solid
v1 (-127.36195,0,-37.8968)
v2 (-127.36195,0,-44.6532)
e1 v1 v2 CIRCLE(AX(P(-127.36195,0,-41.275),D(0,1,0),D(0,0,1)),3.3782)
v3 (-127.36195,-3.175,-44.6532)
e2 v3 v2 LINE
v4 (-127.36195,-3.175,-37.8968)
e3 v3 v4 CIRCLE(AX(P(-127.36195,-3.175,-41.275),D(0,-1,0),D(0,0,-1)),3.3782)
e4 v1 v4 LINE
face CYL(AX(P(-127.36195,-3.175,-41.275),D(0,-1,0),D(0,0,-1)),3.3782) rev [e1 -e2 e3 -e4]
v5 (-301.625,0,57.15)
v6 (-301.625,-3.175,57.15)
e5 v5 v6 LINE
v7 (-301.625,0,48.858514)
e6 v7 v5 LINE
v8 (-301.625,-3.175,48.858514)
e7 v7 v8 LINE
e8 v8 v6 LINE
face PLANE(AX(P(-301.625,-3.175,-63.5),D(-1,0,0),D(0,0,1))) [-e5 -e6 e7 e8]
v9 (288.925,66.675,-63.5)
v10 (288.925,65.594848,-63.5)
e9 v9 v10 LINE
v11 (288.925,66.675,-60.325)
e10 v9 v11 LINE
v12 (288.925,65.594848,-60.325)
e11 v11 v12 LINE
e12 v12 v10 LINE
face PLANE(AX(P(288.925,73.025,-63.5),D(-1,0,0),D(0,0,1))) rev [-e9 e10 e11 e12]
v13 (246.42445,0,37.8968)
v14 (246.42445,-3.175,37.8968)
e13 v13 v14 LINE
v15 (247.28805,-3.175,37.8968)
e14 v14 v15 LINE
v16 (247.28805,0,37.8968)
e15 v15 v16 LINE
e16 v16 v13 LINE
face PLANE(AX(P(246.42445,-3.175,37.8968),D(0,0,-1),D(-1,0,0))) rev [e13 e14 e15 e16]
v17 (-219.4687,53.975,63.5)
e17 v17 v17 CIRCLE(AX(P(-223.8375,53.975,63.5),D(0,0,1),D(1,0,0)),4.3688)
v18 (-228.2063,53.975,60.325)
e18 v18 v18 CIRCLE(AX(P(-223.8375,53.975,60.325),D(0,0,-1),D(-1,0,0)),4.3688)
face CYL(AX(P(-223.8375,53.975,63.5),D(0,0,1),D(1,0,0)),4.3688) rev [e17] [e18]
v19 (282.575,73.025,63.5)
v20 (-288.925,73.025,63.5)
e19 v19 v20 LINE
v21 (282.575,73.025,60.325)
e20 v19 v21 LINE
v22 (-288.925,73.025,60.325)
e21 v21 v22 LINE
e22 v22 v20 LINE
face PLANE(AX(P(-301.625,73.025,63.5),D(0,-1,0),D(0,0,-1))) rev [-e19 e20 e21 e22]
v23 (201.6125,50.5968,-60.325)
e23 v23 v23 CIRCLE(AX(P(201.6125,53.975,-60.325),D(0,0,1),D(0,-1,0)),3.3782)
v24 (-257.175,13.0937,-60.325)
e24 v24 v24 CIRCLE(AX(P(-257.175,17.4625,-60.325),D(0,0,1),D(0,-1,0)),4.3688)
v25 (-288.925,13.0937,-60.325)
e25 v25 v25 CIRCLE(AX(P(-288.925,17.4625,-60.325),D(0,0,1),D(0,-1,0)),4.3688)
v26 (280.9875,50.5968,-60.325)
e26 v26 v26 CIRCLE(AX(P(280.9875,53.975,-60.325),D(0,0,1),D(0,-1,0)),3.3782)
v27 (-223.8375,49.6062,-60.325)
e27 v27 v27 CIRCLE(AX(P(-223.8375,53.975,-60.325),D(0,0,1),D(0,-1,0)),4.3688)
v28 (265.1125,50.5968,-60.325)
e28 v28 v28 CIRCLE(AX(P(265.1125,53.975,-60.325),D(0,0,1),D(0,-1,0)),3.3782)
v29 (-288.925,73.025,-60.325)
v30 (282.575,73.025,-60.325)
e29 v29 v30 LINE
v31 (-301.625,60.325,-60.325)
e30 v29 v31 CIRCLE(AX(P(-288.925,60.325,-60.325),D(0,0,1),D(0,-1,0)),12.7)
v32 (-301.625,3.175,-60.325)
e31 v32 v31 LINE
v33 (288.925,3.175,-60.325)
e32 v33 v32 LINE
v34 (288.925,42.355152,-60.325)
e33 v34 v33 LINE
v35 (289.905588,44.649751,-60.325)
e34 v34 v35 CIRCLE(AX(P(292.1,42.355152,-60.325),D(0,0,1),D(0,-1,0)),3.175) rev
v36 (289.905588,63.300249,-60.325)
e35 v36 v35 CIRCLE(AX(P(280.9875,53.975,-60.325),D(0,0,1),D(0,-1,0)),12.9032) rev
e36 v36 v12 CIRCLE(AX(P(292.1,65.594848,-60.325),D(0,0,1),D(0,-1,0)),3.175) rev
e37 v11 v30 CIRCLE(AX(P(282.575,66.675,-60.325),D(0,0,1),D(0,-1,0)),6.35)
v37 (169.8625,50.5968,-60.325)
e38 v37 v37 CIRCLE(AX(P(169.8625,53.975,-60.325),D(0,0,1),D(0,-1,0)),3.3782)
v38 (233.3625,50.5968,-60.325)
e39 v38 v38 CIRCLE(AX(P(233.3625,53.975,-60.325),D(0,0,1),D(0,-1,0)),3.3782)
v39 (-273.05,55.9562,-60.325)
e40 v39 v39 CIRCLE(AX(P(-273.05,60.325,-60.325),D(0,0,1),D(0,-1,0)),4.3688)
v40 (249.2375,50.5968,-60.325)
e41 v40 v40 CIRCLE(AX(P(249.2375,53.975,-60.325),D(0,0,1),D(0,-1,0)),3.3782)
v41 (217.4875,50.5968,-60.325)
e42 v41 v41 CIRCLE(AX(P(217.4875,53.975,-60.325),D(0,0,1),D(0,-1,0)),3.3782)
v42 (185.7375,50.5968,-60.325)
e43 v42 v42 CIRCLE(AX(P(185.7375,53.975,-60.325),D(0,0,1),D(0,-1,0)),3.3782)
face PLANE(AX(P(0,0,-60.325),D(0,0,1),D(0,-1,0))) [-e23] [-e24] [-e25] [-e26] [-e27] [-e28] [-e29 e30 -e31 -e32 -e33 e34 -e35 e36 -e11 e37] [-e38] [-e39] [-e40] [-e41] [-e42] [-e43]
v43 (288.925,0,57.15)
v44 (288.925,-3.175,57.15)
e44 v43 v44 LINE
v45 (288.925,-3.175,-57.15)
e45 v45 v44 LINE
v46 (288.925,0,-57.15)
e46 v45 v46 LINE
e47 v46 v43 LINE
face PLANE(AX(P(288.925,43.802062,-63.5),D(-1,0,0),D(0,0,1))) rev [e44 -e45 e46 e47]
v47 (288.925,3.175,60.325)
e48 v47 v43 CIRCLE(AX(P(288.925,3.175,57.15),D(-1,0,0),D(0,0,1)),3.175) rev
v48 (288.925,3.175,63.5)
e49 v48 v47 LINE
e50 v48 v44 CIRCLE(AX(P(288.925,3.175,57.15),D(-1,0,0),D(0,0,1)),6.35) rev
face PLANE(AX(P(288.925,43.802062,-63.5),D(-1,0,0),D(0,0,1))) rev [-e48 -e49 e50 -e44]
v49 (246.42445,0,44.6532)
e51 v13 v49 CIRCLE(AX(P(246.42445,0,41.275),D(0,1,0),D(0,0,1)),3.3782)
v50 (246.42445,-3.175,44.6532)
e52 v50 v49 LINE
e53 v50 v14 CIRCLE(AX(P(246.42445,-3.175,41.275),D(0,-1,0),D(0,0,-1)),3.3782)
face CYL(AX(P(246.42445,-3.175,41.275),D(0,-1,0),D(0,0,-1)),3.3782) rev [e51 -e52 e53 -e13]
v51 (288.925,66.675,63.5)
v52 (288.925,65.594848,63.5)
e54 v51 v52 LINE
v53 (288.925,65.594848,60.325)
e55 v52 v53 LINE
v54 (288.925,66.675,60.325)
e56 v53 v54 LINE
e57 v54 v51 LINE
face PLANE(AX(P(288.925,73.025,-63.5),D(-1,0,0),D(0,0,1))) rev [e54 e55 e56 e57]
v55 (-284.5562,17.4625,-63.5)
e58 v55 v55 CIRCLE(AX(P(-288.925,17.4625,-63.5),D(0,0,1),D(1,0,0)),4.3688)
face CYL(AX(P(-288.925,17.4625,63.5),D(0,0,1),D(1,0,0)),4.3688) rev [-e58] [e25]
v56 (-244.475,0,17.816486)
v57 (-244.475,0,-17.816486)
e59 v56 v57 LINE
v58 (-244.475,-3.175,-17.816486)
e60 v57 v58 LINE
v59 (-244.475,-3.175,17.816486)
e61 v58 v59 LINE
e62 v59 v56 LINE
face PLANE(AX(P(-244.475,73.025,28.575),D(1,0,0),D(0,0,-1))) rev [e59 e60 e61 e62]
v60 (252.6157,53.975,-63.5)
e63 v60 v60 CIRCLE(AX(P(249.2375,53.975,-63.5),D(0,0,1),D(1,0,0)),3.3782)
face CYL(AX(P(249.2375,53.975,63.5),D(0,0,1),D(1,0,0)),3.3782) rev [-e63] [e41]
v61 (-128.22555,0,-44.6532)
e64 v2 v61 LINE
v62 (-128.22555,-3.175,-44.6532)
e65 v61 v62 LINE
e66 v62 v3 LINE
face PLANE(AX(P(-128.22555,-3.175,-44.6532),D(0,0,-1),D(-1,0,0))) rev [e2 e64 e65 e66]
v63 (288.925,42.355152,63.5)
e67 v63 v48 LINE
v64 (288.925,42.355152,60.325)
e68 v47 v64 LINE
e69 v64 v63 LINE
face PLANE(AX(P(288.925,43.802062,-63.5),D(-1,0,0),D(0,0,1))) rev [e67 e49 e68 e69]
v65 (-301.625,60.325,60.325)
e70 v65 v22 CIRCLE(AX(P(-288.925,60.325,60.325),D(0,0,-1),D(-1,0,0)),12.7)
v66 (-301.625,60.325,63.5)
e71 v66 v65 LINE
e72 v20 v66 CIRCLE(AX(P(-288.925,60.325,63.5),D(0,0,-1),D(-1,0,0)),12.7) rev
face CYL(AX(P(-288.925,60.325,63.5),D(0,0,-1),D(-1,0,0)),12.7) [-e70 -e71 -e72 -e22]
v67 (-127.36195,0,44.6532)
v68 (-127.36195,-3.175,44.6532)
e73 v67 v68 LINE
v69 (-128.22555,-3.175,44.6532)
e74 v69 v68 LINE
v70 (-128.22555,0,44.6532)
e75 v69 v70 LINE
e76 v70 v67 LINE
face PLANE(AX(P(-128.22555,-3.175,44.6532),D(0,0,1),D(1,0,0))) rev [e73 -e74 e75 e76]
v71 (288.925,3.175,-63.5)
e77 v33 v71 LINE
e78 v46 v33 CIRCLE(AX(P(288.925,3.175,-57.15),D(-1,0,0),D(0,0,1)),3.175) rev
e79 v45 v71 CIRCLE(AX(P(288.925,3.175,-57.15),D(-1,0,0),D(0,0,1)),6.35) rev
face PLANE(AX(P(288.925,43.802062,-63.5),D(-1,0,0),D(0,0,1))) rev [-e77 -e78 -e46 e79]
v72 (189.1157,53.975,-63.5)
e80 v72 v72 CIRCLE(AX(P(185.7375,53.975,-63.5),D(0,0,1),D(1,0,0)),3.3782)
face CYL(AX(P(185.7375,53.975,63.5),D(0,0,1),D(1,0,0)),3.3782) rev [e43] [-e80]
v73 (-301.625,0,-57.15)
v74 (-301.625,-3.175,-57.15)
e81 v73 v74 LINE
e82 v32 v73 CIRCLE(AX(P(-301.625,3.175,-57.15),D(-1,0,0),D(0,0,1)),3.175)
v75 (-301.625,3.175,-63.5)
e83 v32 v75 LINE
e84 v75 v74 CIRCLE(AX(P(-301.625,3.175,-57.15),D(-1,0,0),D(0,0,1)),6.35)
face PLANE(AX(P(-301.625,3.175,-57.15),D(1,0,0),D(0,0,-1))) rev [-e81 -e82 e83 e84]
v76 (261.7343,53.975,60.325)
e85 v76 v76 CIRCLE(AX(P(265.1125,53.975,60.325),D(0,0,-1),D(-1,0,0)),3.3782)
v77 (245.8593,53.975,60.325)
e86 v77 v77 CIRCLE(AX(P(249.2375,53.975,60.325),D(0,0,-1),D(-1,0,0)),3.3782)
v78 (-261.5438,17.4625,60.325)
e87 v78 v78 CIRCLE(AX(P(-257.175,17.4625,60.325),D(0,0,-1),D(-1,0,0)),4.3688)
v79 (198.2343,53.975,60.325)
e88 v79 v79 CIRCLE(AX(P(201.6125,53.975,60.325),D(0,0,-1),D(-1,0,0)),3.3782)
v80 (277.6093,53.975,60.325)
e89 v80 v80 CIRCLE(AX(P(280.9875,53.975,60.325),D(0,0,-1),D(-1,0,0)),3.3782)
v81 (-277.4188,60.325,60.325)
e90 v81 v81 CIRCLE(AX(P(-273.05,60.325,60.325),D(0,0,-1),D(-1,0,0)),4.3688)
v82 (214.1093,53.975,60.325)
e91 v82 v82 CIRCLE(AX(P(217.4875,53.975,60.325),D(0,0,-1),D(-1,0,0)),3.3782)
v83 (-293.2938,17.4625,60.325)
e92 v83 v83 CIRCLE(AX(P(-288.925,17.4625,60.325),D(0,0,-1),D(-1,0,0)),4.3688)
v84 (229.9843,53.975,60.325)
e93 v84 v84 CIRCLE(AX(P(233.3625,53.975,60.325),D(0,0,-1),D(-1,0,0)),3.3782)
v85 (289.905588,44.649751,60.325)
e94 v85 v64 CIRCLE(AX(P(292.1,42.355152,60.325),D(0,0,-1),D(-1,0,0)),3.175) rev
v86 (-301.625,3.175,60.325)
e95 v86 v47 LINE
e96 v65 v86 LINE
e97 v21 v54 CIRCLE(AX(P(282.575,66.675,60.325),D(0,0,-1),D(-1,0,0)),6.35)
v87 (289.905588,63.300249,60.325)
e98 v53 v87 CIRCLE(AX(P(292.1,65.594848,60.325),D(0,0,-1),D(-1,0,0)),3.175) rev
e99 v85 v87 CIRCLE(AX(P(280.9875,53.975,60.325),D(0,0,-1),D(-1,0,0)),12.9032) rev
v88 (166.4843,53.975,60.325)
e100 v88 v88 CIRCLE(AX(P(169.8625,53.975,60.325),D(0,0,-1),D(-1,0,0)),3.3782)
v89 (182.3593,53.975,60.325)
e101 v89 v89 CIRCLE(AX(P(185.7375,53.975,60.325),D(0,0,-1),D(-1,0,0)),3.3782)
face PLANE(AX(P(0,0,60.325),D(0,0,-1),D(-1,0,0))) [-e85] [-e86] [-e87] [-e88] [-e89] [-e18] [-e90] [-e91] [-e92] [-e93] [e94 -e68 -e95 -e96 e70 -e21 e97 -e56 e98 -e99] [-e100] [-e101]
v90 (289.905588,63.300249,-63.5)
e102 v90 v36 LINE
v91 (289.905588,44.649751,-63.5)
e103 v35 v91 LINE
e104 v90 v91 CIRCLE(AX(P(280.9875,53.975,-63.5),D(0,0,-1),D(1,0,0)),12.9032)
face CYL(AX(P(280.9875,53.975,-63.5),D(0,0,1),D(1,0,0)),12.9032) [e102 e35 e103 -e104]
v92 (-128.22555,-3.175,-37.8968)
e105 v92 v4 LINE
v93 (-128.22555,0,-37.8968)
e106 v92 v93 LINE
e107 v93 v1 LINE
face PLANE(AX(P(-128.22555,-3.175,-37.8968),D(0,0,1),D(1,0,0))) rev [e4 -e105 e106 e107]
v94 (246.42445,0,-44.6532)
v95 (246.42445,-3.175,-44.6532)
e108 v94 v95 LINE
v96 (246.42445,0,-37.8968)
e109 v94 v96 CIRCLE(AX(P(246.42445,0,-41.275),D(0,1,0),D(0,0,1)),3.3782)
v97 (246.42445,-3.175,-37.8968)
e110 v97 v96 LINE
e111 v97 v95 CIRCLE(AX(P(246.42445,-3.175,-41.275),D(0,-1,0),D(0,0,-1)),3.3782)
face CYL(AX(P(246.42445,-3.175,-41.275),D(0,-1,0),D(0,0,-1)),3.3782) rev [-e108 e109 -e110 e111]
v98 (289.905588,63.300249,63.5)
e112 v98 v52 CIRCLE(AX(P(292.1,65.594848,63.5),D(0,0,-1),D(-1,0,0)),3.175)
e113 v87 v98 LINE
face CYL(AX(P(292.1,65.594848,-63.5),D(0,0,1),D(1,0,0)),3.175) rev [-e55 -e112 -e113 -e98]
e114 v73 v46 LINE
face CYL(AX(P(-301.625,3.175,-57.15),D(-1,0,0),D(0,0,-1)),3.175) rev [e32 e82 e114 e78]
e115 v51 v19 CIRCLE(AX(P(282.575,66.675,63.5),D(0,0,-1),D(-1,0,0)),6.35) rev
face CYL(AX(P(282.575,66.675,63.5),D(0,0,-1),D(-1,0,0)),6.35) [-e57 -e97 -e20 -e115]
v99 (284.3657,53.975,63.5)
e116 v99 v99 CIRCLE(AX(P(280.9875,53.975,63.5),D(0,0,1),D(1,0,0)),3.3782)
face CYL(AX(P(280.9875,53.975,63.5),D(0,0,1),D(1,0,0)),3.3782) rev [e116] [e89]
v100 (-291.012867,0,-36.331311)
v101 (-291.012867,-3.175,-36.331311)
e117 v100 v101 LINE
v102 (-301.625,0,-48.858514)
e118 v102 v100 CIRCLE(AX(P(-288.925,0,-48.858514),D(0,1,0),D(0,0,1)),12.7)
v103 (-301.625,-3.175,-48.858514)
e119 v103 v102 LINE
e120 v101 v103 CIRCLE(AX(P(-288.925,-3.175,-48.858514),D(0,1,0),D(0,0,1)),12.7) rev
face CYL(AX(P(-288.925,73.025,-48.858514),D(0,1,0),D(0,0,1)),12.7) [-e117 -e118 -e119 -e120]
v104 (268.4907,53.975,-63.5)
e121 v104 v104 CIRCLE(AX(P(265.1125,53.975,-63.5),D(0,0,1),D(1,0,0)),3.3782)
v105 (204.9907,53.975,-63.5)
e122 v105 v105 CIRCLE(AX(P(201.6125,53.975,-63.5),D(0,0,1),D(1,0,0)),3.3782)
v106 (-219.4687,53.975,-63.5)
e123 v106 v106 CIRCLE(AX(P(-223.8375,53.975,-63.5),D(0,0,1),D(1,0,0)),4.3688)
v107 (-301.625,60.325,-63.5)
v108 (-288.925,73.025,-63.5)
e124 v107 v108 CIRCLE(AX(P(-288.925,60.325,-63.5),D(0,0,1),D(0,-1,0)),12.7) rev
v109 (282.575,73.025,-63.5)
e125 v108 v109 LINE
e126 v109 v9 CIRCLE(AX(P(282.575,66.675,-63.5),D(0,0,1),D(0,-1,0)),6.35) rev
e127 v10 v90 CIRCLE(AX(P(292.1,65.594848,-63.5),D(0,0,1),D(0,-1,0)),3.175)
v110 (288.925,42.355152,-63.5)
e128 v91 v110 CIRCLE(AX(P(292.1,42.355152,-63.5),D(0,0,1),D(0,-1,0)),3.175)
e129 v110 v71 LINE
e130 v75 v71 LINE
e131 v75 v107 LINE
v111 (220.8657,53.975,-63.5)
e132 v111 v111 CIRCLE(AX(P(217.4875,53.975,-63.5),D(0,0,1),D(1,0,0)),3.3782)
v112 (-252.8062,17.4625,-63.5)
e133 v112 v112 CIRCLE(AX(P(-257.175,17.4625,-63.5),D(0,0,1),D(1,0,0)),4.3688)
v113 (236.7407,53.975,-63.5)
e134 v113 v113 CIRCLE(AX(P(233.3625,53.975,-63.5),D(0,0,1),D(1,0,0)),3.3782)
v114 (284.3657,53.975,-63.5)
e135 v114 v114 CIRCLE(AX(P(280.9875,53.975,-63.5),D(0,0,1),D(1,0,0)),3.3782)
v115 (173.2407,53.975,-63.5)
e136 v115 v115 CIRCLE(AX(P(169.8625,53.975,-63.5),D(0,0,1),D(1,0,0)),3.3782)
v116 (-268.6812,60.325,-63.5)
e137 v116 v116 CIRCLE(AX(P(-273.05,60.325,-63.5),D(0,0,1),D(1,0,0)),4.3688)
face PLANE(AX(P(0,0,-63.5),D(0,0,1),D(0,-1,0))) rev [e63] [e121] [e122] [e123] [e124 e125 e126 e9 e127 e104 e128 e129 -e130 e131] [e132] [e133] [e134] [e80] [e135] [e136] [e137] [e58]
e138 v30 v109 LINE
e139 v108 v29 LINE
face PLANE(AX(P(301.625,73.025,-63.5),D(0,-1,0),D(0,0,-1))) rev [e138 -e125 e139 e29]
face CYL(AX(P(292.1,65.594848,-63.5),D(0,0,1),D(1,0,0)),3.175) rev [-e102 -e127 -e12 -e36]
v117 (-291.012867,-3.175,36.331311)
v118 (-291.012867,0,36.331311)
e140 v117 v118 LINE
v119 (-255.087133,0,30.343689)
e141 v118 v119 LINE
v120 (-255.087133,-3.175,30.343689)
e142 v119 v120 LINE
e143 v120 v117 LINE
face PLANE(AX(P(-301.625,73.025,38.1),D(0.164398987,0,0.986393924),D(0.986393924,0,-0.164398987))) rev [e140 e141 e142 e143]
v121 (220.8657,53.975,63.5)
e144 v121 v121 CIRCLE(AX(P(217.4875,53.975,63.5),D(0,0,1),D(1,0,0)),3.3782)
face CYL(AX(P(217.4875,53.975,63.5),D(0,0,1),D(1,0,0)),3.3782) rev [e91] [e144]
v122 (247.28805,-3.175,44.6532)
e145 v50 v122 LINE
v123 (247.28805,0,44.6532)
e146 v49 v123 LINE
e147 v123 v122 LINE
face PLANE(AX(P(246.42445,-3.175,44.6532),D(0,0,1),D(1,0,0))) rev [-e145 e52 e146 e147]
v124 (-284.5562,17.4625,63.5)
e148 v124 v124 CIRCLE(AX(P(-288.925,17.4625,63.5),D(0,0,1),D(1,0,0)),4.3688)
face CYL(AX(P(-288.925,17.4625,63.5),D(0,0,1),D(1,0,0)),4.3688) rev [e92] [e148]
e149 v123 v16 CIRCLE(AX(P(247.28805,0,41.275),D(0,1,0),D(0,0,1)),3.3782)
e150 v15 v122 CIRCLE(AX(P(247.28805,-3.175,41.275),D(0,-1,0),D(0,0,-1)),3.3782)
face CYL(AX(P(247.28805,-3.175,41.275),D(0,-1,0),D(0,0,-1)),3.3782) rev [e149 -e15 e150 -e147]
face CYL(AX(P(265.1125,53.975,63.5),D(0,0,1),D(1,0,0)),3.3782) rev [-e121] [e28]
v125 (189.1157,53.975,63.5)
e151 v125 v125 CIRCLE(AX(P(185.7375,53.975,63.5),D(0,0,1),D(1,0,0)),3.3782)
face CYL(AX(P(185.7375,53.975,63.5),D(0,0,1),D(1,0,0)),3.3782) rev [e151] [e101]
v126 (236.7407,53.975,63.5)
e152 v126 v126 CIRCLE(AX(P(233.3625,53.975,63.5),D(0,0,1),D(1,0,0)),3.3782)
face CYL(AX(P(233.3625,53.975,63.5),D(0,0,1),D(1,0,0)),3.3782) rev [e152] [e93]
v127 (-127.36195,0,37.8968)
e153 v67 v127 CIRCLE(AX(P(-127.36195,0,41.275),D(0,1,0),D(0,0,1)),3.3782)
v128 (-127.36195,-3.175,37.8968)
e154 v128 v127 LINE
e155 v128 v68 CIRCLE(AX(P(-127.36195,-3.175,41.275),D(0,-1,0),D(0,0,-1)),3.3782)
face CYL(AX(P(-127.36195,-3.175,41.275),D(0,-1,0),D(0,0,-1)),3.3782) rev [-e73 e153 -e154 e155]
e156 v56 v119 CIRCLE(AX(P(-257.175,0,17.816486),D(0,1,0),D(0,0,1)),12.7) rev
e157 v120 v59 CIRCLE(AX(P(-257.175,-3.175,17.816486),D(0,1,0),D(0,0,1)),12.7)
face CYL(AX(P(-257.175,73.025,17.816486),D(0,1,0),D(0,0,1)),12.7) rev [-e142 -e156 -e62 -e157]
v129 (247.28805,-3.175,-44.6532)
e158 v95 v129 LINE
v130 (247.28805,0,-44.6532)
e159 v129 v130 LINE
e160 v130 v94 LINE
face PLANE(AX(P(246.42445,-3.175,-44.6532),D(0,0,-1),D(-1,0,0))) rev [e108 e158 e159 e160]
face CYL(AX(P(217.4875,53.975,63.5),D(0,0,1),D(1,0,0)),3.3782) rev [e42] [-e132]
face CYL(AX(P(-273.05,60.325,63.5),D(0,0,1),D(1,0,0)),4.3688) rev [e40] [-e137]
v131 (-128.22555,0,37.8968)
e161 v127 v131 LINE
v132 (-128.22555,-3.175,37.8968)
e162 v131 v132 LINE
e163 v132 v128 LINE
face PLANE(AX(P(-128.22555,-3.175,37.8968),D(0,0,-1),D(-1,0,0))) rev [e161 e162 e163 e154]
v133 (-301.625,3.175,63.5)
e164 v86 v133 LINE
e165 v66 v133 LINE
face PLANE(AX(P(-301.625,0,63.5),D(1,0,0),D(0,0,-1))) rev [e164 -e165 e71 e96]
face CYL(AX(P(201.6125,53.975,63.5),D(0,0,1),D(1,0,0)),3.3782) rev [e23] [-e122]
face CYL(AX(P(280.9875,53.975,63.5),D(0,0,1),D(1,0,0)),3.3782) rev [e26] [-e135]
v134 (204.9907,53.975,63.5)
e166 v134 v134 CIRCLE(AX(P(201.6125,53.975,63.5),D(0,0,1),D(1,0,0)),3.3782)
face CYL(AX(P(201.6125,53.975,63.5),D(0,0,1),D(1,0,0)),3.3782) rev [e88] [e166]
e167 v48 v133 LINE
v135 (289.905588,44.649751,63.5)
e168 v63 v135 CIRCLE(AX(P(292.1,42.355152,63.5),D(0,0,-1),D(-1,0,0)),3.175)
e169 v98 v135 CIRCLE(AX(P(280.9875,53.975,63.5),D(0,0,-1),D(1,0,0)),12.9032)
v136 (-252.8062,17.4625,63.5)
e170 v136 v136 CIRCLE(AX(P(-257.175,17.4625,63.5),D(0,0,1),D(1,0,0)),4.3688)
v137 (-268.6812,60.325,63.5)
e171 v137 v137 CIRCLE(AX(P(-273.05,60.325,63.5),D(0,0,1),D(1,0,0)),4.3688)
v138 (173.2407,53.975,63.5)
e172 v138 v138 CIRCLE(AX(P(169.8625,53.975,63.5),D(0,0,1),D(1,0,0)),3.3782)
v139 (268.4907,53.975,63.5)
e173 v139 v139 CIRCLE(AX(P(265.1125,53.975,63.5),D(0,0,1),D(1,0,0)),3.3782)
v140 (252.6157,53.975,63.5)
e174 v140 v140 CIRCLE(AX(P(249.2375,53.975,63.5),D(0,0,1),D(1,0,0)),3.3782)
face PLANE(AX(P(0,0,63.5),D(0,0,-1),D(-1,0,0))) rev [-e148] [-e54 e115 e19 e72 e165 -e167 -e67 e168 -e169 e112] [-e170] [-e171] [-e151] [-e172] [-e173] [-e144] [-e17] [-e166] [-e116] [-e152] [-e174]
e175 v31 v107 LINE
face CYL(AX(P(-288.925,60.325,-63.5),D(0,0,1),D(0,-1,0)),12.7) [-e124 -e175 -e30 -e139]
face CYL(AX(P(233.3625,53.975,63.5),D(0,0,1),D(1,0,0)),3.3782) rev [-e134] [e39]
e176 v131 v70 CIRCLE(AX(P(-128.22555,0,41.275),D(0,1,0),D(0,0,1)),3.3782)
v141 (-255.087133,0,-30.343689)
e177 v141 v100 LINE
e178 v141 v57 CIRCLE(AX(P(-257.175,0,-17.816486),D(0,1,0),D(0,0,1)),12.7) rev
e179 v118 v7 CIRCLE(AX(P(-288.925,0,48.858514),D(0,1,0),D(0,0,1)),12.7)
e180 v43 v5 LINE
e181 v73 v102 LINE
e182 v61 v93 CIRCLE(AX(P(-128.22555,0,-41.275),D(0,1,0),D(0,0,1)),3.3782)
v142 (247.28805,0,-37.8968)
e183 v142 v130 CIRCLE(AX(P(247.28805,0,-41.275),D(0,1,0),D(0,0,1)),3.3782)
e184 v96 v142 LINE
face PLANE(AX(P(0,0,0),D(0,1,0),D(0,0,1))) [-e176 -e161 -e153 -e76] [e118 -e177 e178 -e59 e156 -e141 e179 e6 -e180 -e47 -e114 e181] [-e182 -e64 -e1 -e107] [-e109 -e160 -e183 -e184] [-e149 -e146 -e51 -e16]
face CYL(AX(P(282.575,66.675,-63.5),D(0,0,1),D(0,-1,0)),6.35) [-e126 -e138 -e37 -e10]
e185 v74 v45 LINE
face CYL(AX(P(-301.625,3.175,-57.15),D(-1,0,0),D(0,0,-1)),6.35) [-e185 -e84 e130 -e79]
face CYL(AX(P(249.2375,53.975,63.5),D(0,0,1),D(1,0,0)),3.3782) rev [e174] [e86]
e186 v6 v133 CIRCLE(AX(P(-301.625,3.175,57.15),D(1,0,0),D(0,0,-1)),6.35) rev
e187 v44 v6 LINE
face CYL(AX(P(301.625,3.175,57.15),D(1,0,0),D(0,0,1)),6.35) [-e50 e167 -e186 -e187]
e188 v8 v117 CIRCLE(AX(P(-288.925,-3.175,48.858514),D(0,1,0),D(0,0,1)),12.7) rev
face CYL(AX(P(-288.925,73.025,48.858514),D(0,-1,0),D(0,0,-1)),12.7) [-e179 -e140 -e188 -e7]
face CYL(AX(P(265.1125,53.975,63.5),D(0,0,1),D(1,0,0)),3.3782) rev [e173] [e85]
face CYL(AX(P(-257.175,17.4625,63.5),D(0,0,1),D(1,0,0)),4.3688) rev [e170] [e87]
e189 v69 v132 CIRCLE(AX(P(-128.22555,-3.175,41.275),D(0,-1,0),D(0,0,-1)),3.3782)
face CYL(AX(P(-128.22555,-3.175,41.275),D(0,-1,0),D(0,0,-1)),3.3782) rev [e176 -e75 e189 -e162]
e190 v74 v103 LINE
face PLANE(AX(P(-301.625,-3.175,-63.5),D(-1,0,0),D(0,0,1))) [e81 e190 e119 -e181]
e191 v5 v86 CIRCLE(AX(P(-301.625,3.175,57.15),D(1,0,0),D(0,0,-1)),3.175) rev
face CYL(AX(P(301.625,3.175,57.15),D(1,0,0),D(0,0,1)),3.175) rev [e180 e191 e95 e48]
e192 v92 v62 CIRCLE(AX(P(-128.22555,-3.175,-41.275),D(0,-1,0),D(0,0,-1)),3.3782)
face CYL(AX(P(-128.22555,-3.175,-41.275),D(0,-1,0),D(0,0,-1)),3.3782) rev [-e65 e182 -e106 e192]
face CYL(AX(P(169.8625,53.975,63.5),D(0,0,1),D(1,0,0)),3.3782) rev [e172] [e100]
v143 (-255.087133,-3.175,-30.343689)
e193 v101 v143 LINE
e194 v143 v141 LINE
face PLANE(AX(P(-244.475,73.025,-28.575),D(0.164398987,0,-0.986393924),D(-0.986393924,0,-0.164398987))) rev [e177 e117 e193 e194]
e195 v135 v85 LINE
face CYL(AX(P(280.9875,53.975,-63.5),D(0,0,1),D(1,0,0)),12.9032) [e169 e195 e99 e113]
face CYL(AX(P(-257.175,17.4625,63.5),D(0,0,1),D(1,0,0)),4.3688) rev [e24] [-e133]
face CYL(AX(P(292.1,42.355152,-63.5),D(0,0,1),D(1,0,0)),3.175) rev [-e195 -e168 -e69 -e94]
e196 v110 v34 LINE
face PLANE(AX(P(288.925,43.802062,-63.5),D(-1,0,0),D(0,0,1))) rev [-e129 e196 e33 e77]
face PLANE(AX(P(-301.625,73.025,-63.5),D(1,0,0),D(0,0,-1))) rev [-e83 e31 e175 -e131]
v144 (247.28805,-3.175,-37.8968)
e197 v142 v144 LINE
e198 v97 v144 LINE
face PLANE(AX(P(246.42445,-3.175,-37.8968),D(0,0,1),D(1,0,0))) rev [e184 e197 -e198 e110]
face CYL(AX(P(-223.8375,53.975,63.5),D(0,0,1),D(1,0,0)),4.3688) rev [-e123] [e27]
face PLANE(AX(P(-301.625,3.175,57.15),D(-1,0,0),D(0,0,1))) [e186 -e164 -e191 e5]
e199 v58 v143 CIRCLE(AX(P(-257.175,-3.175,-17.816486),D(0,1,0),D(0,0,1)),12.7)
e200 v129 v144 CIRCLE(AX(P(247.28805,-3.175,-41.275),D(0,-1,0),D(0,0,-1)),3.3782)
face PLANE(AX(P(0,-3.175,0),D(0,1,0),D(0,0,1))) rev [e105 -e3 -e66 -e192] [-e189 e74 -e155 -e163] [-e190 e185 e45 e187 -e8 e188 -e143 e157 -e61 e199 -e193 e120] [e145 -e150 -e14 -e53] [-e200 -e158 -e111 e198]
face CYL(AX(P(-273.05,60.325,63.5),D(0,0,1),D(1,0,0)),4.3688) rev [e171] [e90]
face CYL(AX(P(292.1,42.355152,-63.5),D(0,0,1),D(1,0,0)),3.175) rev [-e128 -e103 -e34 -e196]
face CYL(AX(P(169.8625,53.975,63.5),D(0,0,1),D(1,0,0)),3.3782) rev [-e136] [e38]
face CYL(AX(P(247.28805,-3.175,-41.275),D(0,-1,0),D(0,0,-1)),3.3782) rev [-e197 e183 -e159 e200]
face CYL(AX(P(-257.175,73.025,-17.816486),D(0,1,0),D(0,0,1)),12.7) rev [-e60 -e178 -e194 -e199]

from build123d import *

# Parameters (mm, degrees)
SKETCH1_W                                 = 603.25
SKETCH1_H                                 = 127
BASE_FLANGE1_DEPTH                        = 3.175
EDGE_FLANGE1_STRIP_W                      = 19.05
EDGE_FLANGE1_STRIP_H                      = 3.175
EDGE_FLANGE1_STRIP_CUT_DEPTH              = 603.25
EDGE_FLANGE1_STRIP_2_W                    = 19.05
EDGE_FLANGE1_STRIP_2_H                    = 3.175
EDGE_FLANGE1_STRIP_CUT_2_DEPTH            = 603.25
EDGE_FLANGE1_DEPTH                        = 603.25
EDGE_FLANGE1_BEND_DEPTH                   = 603.25
F_1_4_CLEARANCE_HOLE1_D                   = 6.7564
HOLE_FOR_1_4_SELF_CLINCHING_NUTS_S_SS_C_D = 8.7376
CUT_EXTRUDE3_DEPTH                        = 336.319685151
FILLET1_R                                 = 6.35
HOLE_FOR_1_4_SELF_CLINCHING_NUTS_S_2_D    = 8.7376
CUT_EXTRUDE2_DEPTH                        = 318.515874603
FILLET3_R                                 = 12.7
FILLET4_R                                 = 12.7
F_1_4_START                               = -3.175
F_1_4_CLEARANCE_SLOT1_DEPTH               = 3.175
FILLET5_R                                 = 3.175


# Read off the part's stored shape, not the designer's step: 1/4 Clearance Slot1
# Sheet-metal steps are written as plain solids
with BuildPart() as part:
    # Sketch1 → Base-Flange1 (new body)
    with BuildSketch(Plane(origin=(0, 0, 0), x_dir=(1, 0, 0), z_dir=(0, 1, 0))):
        Rectangle(SKETCH1_W, SKETCH1_H)
    extrude(amount=-BASE_FLANGE1_DEPTH)

    # Edge-Flange1 strip (across the edge) → Edge-Flange1 strip cut (cut)
    with BuildSketch(Plane(origin=(301.625, 0, -63.5), x_dir=(0, 0, 1), z_dir=(-1, 0, 0))):
        with Locations((-3.175, -1.5875)):
            Rectangle(EDGE_FLANGE1_STRIP_W, EDGE_FLANGE1_STRIP_H)
    extrude(amount=EDGE_FLANGE1_STRIP_CUT_DEPTH, mode=Mode.SUBTRACT)

    # Edge-Flange1 strip 2 (across the edge) → Edge-Flange1 strip cut 2 (cut)
    with BuildSketch(Plane(origin=(-301.625, 0, 63.5), x_dir=(0, 0, -1), z_dir=(1, 0, 0))):
        with Locations((-3.175, -1.5875)):
            Rectangle(EDGE_FLANGE1_STRIP_2_W, EDGE_FLANGE1_STRIP_2_H)
    extrude(amount=EDGE_FLANGE1_STRIP_CUT_2_DEPTH, mode=Mode.SUBTRACT)

    # Edge-Flange1 section (across the edge) → Edge-Flange1 (add)
    with BuildSketch(Plane(origin=(301.625, 0, -63.5), x_dir=(0, 0, 1), z_dir=(-1, 0, 0))):
        with BuildLine():
            Line((0, 3.175), (0, 73.025))
            Line((0, 73.025), (3.175, 73.025))
            Line((3.175, 73.025), (3.175, 3.175))
            ThreePointArc((3.175, 3.175), (4.10493597, 0.92993597), (6.35, 0))
            Line((6.35, 0), (6.35, -3.175))
            ThreePointArc((6.35, -3.175), (1.859871939, -1.315128061), (0, 3.175))
        make_face()
    extrude(amount=EDGE_FLANGE1_DEPTH)

    # Edge-Flange1 section 2 (across the edge) → Edge-Flange1 bend (add)
    with BuildSketch(Plane(origin=(-301.625, 0, 63.5), x_dir=(0, 0, -1), z_dir=(1, 0, 0))):
        with BuildLine():
            Line((0, 3.175), (0, 73.025))
            Line((0, 73.025), (3.175, 73.025))
            Line((3.175, 73.025), (3.175, 3.175))
            ThreePointArc((3.175, 3.175), (4.10493597, 0.92993597), (6.35, 0))
            Line((6.35, 0), (6.35, -3.175))
            ThreePointArc((6.35, -3.175), (1.859871939, -1.315128061), (0, 3.175))
        make_face()
    extrude(amount=EDGE_FLANGE1_BEND_DEPTH)

    # 1/4 Clearance Hole1 (through all)
    with Locations(Plane.XY.offset(63.5)):
        with Locations((169.8625, 53.975), (185.7375, 53.975), (201.6125, 53.975), (217.4875, 53.975), (233.3625, 53.975), (249.2375, 53.975), (265.1125, 53.975), (280.9875, 53.975)):
            Hole(F_1_4_CLEARANCE_HOLE1_D / 2)

    # Hole for 1_4 Self-clinching Nuts _S_SS_C (through all)
    with Locations(Plane.XY.offset(63.5)):
        with Locations((-223.8375, 53.975)):
            Hole(HOLE_FOR_1_4_SELF_CLINCHING_NUTS_S_SS_C_D / 2)

    # Sketch33 → Cut-Extrude3 (cut, through all)
    with BuildSketch(Plane.XY.offset(63.5)):
        with BuildLine():
            Line((301.625, 73.025), (288.925, 73.025))
            Line((288.925, 73.025), (288.925, 64.147937825))
            ThreePointArc((288.925, 64.147937825), (293.8907, 53.975), (288.925, 43.802062175))
            Line((288.925, 43.802062175), (288.925, -3.175))
            Line((288.925, -3.175), (301.625, -3.175))
            Line((301.625, -3.175), (301.625, 73.025))
        make_face()
    extrude(amount=-CUT_EXTRUDE3_DEPTH, mode=Mode.SUBTRACT)

    # Fillet1
    fillet1_edges = [part.edges().sort_by_distance(p)[0] for p in [
        (288.925, 73.025, 61.9125),
        (288.925, 73.025, -61.9125),
    ]]
    fillet(fillet1_edges, radius=FILLET1_R)

    # Hole for 1_4 Self-clinching Nuts _S_ 2 (through all)
    with Locations(Plane.XY.offset(63.5)):
        with Locations((-273.05, 60.325), (-257.175, 17.4625), (-288.925, 17.4625)):
            Hole(HOLE_FOR_1_4_SELF_CLINCHING_NUTS_S_2_D / 2)

    # Sketch23 → Cut-Extrude2 (cut, through all)
    with BuildSketch(Plane.XZ.offset(3.175)):
        Polygon((-301.625, 38.1), (-244.475, 28.575), (-244.475, -28.575), (-301.625, -38.1), align=None)
    extrude(amount=-CUT_EXTRUDE2_DEPTH, mode=Mode.SUBTRACT)

    # Fillet3
    fillet3_edges = [part.edges().sort_by_distance(p)[0] for p in [
        (-301.625, -1.5875, -38.1),
        (-301.625, -1.5875, 38.1),
        (-244.475, -1.5875, 28.575),
        (-244.475, -1.5875, -28.575),
    ]]
    fillet(fillet3_edges, radius=FILLET3_R)

    # Fillet4
    fillet4_edges = [part.edges().sort_by_distance(p)[0] for p in [
        (-301.625, 73.025, -61.9125),
        (-301.625, 73.025, 61.9125),
    ]]
    fillet(fillet4_edges, radius=FILLET4_R)

    # 1/4 Clearance Slot1 outline → 1/4 Clearance Slot1 (cut)
    with BuildSketch(Plane(origin=(0, 0, 0), x_dir=(1, 0, 0), z_dir=(0, 1, 0)).offset(F_1_4_START)):
        with BuildLine():
            ThreePointArc((247.28805, -44.6532), (250.66625, -41.275), (247.28805, -37.8968))
            Line((247.28805, -37.8968), (246.42445, -37.8968))
            ThreePointArc((246.42445, -37.8968), (243.04625, -41.275), (246.42445, -44.6532))
            Line((246.42445, -44.6532), (247.28805, -44.6532))
        make_face()
        with BuildLine():
            ThreePointArc((-128.22555, -37.8968), (-131.60375, -41.275), (-128.22555, -44.6532))
            Line((-128.22555, -44.6532), (-127.36195, -44.6532))
            ThreePointArc((-127.36195, -44.6532), (-123.98375, -41.275), (-127.36195, -37.8968))
            Line((-127.36195, -37.8968), (-128.22555, -37.8968))
        make_face()
        with BuildLine():
            ThreePointArc((-127.36195, 37.8968), (-123.98375, 41.275), (-127.36195, 44.6532))
            Line((-127.36195, 44.6532), (-128.22555, 44.6532))
            ThreePointArc((-128.22555, 44.6532), (-131.60375, 41.275), (-128.22555, 37.8968))
            Line((-128.22555, 37.8968), (-127.36195, 37.8968))
        make_face()
        with BuildLine():
            ThreePointArc((246.42445, 44.6532), (243.04625, 41.275), (246.42445, 37.8968))
            Line((246.42445, 37.8968), (247.28805, 37.8968))
            ThreePointArc((247.28805, 37.8968), (250.66625, 41.275), (247.28805, 44.6532))
            Line((247.28805, 44.6532), (246.42445, 44.6532))
        make_face()
    extrude(amount=F_1_4_CLEARANCE_SLOT1_DEPTH, mode=Mode.SUBTRACT)

    # Fillet5
    fillet5_edges = [part.edges().sort_by_distance(p)[0] for p in [
        (288.925, 43.802062175, -61.9125),
        (288.925, 64.147937825, -61.9125),
        (288.925, 43.802062175, 61.9125),
        (288.925, 64.147937825, 61.9125),
    ]]
    fillet(fillet5_edges, radius=FILLET5_R)


solid = part.part
